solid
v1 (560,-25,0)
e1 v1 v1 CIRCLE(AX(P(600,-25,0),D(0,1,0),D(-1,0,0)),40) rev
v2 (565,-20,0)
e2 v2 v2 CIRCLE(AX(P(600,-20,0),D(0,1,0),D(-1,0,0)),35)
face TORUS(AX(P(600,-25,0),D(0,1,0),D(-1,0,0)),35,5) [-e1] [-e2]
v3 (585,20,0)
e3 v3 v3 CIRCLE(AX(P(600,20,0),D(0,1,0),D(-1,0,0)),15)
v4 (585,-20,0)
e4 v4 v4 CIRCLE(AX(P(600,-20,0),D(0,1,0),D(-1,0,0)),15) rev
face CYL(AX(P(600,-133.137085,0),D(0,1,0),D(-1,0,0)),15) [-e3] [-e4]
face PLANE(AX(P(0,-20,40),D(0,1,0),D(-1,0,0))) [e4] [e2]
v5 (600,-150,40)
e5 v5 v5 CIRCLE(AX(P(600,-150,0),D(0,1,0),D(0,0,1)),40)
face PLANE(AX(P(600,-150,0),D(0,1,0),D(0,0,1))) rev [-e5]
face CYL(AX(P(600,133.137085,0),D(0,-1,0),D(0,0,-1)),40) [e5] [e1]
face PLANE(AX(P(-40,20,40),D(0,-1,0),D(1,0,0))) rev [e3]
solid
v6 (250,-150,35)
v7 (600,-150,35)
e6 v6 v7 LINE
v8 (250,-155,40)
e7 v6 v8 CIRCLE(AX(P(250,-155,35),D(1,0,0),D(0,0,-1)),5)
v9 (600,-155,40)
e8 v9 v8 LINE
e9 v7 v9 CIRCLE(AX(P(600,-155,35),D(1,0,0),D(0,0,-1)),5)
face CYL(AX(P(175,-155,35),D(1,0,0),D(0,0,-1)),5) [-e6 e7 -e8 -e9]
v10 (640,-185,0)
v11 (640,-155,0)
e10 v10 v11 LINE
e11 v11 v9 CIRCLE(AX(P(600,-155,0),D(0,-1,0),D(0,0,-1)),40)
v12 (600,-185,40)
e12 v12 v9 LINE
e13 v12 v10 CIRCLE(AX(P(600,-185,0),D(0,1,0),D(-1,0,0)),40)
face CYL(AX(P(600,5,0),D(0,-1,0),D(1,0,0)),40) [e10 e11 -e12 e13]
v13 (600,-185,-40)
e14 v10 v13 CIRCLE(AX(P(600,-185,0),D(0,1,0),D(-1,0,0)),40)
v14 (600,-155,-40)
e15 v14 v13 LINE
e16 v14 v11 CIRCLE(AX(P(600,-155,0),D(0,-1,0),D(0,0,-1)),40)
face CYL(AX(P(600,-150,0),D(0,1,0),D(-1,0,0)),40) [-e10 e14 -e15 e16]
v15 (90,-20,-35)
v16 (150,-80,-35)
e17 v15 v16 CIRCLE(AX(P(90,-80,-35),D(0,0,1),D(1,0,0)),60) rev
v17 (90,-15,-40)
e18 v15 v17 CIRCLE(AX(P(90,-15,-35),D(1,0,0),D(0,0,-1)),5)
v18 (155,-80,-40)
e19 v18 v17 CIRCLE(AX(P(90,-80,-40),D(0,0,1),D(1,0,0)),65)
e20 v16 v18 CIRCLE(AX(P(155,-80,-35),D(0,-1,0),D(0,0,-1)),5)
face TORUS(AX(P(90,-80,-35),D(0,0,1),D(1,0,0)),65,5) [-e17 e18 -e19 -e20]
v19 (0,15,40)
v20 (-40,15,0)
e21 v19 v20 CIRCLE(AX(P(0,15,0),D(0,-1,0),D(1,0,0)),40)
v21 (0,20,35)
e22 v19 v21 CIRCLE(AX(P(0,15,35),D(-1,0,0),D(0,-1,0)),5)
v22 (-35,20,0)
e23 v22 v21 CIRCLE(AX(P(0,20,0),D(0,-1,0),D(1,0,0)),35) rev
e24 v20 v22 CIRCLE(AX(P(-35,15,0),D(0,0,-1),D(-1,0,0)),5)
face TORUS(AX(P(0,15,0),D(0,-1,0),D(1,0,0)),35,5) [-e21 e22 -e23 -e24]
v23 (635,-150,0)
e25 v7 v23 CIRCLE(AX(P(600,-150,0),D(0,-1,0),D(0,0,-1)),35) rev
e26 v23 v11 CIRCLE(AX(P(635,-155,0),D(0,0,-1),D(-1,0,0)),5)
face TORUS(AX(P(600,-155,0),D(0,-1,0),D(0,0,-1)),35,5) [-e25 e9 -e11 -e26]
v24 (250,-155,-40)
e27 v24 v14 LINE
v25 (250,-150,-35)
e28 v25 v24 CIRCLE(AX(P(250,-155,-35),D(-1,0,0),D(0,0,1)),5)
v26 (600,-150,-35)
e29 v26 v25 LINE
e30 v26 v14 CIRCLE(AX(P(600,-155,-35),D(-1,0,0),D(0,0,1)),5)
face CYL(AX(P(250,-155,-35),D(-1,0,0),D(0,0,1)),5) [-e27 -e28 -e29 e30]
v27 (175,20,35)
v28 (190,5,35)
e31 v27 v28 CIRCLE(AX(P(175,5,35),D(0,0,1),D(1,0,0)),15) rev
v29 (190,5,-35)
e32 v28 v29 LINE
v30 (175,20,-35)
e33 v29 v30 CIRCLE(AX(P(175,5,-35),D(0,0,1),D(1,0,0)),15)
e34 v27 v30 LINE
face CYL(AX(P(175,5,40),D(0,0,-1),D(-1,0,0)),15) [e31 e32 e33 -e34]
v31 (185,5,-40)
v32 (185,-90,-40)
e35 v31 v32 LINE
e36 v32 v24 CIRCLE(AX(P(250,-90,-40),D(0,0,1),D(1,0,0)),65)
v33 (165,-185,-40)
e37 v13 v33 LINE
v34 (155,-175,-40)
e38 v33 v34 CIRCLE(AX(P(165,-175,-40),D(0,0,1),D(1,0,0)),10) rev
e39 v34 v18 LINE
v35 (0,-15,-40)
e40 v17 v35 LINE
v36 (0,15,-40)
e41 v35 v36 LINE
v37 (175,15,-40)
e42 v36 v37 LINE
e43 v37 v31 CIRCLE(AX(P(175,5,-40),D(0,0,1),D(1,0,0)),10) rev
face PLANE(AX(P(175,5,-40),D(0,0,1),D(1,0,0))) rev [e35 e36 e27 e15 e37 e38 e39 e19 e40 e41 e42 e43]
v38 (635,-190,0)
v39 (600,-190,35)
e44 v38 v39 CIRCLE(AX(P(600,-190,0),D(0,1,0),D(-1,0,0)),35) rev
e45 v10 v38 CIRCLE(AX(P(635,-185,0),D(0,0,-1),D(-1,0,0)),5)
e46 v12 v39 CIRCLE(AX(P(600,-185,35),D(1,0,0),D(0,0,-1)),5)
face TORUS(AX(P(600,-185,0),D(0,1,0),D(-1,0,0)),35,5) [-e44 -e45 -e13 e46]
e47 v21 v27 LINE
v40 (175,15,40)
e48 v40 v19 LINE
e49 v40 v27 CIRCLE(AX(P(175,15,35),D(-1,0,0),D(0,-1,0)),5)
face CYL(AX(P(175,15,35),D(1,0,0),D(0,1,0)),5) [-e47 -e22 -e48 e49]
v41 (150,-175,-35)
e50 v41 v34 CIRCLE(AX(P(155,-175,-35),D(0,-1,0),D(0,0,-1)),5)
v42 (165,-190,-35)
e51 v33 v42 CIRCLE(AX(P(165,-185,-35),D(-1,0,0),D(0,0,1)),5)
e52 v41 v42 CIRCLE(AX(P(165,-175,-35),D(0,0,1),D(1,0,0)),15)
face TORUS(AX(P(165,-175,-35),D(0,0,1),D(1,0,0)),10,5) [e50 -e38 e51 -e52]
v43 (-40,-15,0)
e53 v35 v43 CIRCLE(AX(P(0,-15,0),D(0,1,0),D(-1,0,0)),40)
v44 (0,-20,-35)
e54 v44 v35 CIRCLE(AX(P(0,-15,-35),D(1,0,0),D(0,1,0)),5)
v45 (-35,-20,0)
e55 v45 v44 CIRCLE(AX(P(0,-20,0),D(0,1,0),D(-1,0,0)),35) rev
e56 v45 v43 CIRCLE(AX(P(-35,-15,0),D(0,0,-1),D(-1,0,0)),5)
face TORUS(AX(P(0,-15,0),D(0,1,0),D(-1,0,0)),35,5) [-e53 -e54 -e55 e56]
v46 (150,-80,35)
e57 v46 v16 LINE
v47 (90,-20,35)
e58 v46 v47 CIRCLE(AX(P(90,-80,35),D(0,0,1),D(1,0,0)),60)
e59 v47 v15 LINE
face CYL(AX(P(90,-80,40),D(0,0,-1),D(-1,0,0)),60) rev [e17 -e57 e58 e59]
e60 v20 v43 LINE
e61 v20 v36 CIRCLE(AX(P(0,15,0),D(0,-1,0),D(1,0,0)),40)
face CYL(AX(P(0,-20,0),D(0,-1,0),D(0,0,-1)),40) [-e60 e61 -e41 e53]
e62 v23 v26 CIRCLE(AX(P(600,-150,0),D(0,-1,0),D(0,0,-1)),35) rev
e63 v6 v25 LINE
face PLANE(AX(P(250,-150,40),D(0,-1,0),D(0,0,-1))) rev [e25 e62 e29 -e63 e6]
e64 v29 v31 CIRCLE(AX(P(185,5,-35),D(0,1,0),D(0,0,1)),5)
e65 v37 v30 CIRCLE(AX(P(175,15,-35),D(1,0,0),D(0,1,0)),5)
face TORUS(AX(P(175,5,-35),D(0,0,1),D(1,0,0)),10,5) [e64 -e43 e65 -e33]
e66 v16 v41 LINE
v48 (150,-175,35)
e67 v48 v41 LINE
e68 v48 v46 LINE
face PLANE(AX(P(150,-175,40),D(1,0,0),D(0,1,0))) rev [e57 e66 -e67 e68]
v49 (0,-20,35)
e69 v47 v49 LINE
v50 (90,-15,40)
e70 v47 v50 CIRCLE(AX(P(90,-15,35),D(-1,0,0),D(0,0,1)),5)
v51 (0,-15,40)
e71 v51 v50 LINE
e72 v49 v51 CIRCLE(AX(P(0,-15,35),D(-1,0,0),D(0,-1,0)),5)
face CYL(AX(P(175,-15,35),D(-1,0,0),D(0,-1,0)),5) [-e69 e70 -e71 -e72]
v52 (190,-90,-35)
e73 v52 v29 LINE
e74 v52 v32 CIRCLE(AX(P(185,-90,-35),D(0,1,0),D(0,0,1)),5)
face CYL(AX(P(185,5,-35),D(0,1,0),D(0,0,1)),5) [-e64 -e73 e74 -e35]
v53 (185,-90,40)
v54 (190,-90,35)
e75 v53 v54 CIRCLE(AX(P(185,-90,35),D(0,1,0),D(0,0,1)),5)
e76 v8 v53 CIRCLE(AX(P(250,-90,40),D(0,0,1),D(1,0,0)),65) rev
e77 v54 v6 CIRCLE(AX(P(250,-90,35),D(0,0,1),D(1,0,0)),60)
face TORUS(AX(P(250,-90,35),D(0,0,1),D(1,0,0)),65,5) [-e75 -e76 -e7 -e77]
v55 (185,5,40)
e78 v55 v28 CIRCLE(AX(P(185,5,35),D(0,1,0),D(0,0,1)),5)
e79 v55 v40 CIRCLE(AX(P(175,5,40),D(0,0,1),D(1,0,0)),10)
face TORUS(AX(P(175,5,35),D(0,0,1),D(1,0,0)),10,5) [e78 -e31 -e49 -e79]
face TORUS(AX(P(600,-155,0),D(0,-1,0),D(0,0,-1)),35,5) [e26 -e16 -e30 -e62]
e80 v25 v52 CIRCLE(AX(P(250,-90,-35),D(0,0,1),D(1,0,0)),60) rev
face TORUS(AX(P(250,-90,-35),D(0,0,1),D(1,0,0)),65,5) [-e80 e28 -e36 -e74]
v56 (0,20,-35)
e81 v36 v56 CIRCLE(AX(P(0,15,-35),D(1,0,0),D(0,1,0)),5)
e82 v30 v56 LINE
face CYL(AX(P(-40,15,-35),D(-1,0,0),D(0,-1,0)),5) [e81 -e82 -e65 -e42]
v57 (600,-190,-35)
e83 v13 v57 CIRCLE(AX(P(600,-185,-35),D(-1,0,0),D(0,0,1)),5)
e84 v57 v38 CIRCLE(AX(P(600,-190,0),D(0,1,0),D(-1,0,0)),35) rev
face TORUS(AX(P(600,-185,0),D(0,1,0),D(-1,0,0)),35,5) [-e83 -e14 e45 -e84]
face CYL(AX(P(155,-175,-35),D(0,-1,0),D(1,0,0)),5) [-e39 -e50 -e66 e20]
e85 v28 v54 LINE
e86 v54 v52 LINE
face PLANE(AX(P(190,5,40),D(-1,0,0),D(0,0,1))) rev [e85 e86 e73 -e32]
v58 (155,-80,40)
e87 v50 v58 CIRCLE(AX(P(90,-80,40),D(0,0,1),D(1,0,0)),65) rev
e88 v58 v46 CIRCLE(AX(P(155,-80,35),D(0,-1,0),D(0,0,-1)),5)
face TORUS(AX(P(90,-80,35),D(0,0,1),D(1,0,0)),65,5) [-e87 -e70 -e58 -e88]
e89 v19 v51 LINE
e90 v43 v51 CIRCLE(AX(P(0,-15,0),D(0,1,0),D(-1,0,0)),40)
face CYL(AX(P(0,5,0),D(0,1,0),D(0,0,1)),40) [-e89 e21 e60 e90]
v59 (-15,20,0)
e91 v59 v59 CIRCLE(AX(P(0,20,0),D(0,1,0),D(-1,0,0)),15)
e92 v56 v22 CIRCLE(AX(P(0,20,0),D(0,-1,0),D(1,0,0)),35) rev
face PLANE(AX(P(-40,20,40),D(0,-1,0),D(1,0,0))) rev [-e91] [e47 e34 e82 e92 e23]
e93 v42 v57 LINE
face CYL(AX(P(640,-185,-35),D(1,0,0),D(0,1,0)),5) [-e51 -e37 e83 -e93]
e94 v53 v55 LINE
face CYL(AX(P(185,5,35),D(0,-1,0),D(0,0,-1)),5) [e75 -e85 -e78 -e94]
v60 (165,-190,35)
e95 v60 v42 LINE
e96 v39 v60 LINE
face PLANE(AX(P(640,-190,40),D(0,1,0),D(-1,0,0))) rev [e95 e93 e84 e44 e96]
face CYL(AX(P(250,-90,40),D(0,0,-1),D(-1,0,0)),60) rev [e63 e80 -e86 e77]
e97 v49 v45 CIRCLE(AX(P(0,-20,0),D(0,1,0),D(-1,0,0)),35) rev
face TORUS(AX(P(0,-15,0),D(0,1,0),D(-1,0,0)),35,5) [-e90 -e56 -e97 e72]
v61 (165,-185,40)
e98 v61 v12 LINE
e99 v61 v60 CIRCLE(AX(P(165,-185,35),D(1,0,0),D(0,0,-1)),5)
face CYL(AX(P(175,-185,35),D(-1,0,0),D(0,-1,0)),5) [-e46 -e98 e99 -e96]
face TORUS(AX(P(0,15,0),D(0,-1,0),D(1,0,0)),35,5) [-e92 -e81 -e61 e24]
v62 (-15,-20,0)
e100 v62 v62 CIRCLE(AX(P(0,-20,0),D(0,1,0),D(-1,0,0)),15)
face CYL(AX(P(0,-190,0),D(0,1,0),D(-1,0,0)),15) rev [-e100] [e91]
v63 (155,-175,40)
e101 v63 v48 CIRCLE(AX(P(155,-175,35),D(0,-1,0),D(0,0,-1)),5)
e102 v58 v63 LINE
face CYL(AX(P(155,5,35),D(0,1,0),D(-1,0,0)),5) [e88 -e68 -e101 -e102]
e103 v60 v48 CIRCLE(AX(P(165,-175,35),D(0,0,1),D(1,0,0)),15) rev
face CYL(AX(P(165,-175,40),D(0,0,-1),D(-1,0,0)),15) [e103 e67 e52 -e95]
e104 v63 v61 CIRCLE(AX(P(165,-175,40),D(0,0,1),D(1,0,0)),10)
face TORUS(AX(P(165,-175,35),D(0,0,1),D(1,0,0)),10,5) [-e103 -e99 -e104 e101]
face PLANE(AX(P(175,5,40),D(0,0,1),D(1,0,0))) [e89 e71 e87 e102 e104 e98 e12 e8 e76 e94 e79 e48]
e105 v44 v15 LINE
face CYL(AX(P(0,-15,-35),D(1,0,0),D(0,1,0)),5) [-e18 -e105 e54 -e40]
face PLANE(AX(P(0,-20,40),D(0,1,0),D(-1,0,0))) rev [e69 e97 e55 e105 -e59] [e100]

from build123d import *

# Parameters (mm, degrees)
BOSS_EXTRUDE1_DEPTH = 40
SKETCH2_R           = 40
BOSS_EXTRUDE2_DEPTH = 170
SKETCH3_R           = 40
SKETCH3_R_2         = 15
CUT_EXTRUDE1_DEPTH  = 40
SKETCH4_R           = 15
CUT_EXTRUDE2_DEPTH  = 675.759216313
FILLET1_R           = 40
FILLET2_R           = 40
FILLET3_R           = 5
FILLET4_R           = 5


with BuildPart() as part:
    # Sketch1 → Boss-Extrude1 (new, symmetric)
    with BuildSketch(Plane.XY):
        with BuildLine():
            Line((0, -20), (-40, -20))
            Line((-40, -20), (-40, 20))
            Line((-40, 20), (0, 20))
            Line((0, 20), (175, 20))
            ThreePointArc((175, 20), (185.606601718, 15.606601718), (190, 5))
            Line((190, 5), (190, -90))
            ThreePointArc((190, -90), (207.573593129, -132.426406871), (250, -150))
            Line((250, -150), (640, -150))
            Line((640, -150), (640, -190))
            Line((640, -190), (165, -190))
            ThreePointArc((165, -190), (154.393398282, -185.606601718), (150, -175))
            Line((150, -175), (150, -80))
            ThreePointArc((150, -80), (132.426406871, -37.573593129), (90, -20))
            Line((90, -20), (0, -20))
        make_face()
    extrude(amount=BOSS_EXTRUDE1_DEPTH, both=True)

    # Sketch4 → Cut-Extrude2 (cut, through all)
    with BuildSketch(Plane(origin=(0, 20, 0), x_dir=(1, 0, 0), z_dir=(0, 1, 0))):
        with Locations(Location((0, 0, 0), (0, 0, 180))):
            Circle(SKETCH4_R)
    extrude(amount=-CUT_EXTRUDE2_DEPTH, mode=Mode.SUBTRACT)

    # Fillet1
    fillet1_edges = [part.edges().sort_by_distance(p)[0] for p in [
        (640, -170, 40),
        (640, -170, -40),
    ]]
    fillet(fillet1_edges, radius=FILLET1_R - 0.0001)  # a hair under: the kernel refuses the full size

    # Fillet2
    fillet2_edges = [part.edges().sort_by_distance(p)[0] for p in [
        (-40, 0, 40),
        (-40, 0, -40),
    ]]
    fillet(fillet2_edges, radius=FILLET2_R - 0.0001)  # a hair under: the kernel refuses the full size

    # Fillet4
    fillet4_edges = [part.edges().sort_by_distance(p)[0] for p in [
        (150, -127.5, 40),
        (87.49995, 20, -40),
        (185.606601718, 15.606601718, -40),
        (190, -42.5, -40),
        (207.573593129, -132.426406871, -40),
        (154.393398282, -185.606601718, 40),
        (382.50005, -190, -40),
        (154.393398282, -185.606601718, -40),
        (150, -127.5, -40),
        (132.426406871, -37.573593129, -40),
        (382.50005, -190, 40),
        (207.573593129, -132.426406871, 40),
        (190, -42.5, 40),
        (185.606601718, 15.606601718, 40),
        (87.49995, 20, 40),
        (425.00005, -150, 40),
        (425.00005, -150, -40),
        (628.284300537, -150, -28.284300537),
        (628.284300537, -150, 28.284300537),
        (628.284300537, -190, -28.284300537),
        (628.284300537, -190, 28.284300537),
        (44.99995, -20, 40),
        (44.99995, -20, -40),
        (-28.284300537, -20, -28.284300537),
        (-28.284300537, -20, 28.284300537),
        (-28.284300537, 20, -28.284300537),
        (-28.284300537, 20, 28.284300537),
        (132.426406871, -37.573593129, 40),
    ]]
    fillet(fillet4_edges, radius=FILLET4_R)


with BuildPart() as body_2:
    # Sketch2 → Boss-Extrude2 (new body)
    with BuildSketch(Plane(origin=(0, -150, 0), x_dir=(1, 0, 0), z_dir=(0, 1, 0))):
        with Locations((600, 0)):
            Circle(SKETCH2_R)
    extrude(amount=BOSS_EXTRUDE2_DEPTH)

    # Sketch3 → Cut-Extrude1 (cut)
    with BuildSketch(Plane(origin=(0, 20, 0), x_dir=(1, 0, 0), z_dir=(0, 1, 0))):
        with Locations(Location((600, 0, 0), (0, 0, 180))):
            Circle(SKETCH3_R)
        with Locations(Location((600, 0, 0), (0, 0, 180))):
            Circle(SKETCH3_R_2, mode=Mode.SUBTRACT)
    extrude(amount=-CUT_EXTRUDE1_DEPTH, mode=Mode.SUBTRACT)

    # Fillet3
    fillet3_edges = [body_2.edges().sort_by_distance(p)[0] for p in [
        (560, -20, 0),
    ]]
    fillet(fillet3_edges, radius=FILLET3_R)


solid = Compound([part.part, body_2.part])
